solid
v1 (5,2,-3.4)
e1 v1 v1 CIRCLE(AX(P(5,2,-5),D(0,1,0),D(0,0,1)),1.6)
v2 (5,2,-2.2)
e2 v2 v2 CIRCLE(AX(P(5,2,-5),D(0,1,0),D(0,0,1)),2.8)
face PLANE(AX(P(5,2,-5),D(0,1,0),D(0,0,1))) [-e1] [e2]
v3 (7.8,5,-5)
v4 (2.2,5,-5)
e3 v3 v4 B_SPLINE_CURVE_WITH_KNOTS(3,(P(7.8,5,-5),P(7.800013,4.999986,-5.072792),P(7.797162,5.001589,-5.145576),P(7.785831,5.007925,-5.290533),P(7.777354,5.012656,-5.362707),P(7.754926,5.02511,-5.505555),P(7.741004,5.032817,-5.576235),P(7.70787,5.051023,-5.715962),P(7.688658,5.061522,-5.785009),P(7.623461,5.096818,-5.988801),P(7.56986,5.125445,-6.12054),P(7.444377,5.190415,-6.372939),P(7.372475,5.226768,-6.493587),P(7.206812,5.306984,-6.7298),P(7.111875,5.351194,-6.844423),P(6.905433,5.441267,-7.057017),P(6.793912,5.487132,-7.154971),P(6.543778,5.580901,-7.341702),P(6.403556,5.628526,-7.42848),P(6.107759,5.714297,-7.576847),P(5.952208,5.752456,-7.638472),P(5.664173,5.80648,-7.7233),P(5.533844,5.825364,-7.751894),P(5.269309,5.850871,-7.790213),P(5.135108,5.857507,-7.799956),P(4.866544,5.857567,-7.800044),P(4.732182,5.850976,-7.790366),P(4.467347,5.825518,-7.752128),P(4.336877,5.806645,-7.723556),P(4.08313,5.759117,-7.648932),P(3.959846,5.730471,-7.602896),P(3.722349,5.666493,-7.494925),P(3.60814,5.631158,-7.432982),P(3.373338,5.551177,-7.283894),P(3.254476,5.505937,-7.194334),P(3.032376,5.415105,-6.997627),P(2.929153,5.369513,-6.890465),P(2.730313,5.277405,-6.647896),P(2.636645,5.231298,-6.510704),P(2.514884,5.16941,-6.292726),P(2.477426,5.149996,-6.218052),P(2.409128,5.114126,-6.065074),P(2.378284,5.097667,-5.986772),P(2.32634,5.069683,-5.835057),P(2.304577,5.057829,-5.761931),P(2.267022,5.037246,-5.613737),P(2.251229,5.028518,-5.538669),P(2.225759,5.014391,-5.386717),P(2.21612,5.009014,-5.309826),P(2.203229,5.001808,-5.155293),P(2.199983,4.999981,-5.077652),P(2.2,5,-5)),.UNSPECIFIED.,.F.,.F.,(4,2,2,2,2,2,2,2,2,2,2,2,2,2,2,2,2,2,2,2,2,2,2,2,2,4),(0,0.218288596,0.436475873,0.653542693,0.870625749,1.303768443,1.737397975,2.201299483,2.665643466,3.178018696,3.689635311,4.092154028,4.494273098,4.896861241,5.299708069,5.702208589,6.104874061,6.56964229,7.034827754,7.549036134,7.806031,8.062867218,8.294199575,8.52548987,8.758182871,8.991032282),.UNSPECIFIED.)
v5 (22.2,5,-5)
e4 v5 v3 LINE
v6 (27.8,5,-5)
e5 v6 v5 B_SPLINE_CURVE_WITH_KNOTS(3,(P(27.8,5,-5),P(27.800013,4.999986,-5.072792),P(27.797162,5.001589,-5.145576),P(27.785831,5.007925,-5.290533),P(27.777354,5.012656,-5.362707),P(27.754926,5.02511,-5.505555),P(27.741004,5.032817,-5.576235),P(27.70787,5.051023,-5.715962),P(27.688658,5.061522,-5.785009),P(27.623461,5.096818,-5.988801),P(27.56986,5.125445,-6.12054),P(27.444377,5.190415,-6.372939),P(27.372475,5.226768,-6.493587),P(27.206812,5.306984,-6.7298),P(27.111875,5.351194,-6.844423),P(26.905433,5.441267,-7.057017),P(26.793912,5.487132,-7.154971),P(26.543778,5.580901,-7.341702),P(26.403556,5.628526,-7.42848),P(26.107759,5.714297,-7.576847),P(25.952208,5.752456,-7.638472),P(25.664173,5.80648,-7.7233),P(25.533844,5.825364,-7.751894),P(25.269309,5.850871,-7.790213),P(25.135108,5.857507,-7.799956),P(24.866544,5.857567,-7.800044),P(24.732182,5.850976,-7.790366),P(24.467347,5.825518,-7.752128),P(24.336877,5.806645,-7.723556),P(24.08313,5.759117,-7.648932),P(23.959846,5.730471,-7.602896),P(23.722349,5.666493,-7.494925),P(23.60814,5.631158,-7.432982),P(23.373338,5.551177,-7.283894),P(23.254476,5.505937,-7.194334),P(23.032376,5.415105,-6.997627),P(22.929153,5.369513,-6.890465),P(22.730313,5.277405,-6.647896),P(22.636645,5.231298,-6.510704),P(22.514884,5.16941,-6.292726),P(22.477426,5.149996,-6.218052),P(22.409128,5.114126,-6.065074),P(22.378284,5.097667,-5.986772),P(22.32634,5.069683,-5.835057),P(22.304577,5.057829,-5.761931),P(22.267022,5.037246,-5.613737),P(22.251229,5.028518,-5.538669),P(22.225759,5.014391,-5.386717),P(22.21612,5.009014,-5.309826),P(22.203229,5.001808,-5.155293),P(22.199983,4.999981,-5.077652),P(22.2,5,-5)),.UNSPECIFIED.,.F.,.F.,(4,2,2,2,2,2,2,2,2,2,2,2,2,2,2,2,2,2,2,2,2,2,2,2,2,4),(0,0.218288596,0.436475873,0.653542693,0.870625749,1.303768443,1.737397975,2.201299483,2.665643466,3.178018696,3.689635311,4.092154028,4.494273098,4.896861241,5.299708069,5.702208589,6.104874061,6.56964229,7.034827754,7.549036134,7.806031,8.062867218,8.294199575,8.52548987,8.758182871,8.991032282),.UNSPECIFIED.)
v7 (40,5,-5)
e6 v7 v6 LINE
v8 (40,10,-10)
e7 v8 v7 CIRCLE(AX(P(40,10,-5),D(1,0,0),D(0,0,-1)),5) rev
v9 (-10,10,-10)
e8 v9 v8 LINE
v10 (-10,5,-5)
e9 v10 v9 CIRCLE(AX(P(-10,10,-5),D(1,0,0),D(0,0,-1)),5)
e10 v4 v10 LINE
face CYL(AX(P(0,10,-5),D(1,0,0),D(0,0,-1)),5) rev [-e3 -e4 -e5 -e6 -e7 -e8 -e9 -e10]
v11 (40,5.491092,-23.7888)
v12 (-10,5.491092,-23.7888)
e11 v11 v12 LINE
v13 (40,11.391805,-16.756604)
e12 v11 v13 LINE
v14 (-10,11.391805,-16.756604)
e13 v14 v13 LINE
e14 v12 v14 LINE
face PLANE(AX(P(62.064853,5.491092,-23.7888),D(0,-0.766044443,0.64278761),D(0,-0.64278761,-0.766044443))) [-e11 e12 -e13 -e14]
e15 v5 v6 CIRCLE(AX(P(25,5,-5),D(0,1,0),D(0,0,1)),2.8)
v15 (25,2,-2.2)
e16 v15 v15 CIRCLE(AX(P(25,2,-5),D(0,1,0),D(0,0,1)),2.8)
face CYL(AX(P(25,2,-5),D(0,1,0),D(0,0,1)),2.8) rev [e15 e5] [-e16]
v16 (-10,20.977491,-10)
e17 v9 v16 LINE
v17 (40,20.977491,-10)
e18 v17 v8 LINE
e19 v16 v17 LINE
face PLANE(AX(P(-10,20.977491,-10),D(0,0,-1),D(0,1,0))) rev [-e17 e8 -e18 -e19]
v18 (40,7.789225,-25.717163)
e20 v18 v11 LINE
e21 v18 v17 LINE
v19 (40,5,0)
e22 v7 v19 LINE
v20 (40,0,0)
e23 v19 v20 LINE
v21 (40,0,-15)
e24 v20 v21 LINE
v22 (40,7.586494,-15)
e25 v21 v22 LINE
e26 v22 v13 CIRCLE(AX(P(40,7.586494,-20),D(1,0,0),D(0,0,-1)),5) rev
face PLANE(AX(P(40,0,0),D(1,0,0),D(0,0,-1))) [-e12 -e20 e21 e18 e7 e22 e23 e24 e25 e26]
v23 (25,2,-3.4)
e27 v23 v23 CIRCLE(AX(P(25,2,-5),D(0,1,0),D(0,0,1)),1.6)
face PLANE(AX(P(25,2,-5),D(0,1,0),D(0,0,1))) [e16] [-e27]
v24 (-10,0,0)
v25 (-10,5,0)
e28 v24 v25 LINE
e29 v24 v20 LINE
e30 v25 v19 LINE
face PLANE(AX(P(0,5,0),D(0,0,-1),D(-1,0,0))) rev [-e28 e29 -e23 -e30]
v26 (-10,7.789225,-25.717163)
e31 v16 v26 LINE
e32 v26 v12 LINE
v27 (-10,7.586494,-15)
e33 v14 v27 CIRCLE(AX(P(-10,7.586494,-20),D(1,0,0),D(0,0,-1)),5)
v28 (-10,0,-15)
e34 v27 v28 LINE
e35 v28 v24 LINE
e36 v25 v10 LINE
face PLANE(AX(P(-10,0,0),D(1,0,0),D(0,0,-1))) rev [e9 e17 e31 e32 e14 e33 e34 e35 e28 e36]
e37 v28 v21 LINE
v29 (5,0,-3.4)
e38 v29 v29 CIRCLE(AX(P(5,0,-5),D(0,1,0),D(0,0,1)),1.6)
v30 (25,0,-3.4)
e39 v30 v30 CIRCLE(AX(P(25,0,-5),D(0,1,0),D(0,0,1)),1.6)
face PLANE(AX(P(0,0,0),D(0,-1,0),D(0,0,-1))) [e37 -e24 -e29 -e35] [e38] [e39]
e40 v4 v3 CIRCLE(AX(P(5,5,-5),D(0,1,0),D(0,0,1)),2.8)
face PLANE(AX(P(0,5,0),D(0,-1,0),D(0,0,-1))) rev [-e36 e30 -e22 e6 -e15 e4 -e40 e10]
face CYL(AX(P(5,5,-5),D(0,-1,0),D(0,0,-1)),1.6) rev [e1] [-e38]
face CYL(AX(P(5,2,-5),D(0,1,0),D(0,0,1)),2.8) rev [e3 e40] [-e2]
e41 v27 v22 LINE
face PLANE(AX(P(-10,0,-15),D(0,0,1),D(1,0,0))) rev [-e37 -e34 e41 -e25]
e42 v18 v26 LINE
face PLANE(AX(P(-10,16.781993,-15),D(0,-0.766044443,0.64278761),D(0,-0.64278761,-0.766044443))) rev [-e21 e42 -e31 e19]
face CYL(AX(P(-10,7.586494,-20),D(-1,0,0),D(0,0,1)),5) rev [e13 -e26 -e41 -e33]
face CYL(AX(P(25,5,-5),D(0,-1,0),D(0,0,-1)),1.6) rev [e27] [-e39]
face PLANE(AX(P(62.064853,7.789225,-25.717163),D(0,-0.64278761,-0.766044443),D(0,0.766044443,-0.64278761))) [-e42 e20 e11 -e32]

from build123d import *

# Parameters (mm, degrees)
CROQUIS1_W              = 30
CROQUIS1_H              = 10
CROQUIS1_R              = 1.6
SALIENTE_EXTRUIR1_DEPTH = 5
CROQUIS2_R              = 2.8
CORTAR_EXTRUIR1_DEPTH   = 3
SALIENTE_EXTRUIR5_DEPTH = 10
SALIENTE_EXTRUIR6_DEPTH = 30
SALIENTE_EXTRUIR7_DEPTH = 10
REDONDEO1_R             = 5
REDONDEO2_R             = 5
SALIENTE_EXTRUIR8_DEPTH = 50


# Some blends are built 0.0001 mm under size
with BuildPart() as part:
    # Croquis1 → Saliente-Extruir1 (new body)
    with BuildSketch(Plane(origin=(0, 0, 0), x_dir=(1, 0, 0), z_dir=(0, 1, 0))):
        with Locations((15, 5)):
            Rectangle(CROQUIS1_W, CROQUIS1_H)
        with Locations(Location((5, 5, 0), (0, 0, 270))):
            Circle(CROQUIS1_R, mode=Mode.SUBTRACT)
        with Locations(Location((25, 5, 0), (0, 0, 270))):
            Circle(CROQUIS1_R, mode=Mode.SUBTRACT)
    extrude(amount=SALIENTE_EXTRUIR1_DEPTH)

    # Croquis2 → Cortar-Extruir1 (cut)
    with BuildSketch(Plane(origin=(0, 5, 0), x_dir=(1, 0, 0), z_dir=(0, 1, 0))):
        with Locations(Location((5, 5, 0), (0, 0, 270))):
            Circle(CROQUIS2_R)
        with Locations(Location((25, 5, 0), (0, 0, 270))):
            Circle(CROQUIS2_R)
    extrude(amount=-CORTAR_EXTRUIR1_DEPTH, mode=Mode.SUBTRACT)

    # Croquis6 → Saliente-Extruir5 (add)
    with BuildSketch(Plane.ZY):
        Polygon((-15, 16.781992624), (-10, 20.977490779), (-10, 16.781992624), (-10, 5), (0, 5), (0, 0), (-10, 0), (-15, 0), (-15, 12.586494468), (-20, 12.586494468), align=None)
    extrude(amount=SALIENTE_EXTRUIR5_DEPTH)

    # Croquis7 → Saliente-Extruir6 (add)
    with BuildSketch(Plane(origin=(0, 0, 0), x_dir=(0, 0, -1), z_dir=(1, 0, 0))):
        Polygon((10, 20.977490779), (10, 5), (10, 0), (15, 0), (15, 12.586494468), (20, 12.586494468), align=None)
    extrude(amount=SALIENTE_EXTRUIR6_DEPTH)

    # Croquis8 → Saliente-Extruir7 (add)
    with BuildSketch(Plane(origin=(30, 0, 0), x_dir=(0, 0, -1), z_dir=(1, 0, 0))):
        Polygon((0, 0), (15, 0), (15, 12.586494468), (20, 12.586494468), (10, 20.977490779), (10, 5), (0, 5), align=None)
    extrude(amount=SALIENTE_EXTRUIR7_DEPTH)

    # Redondeo1
    # the kernel refuses this fillet: 5 mm, written as the material it adds along each edge
    with BuildSketch(Plane(origin=(40, 5, -10), x_dir=(0, 1, 0), z_dir=(-1, 0, 0))) as redondeo1_piece_1_section:
        with BuildLine():
            CenterArc((REDONDEO1_R, -REDONDEO1_R), REDONDEO1_R, 90, 90)
            Line((0, -REDONDEO1_R), (0, 0))
            Line((0, 0), (REDONDEO1_R, 0))
        make_face()
    redondeo1_piece_1 = extrude(amount=50, mode=Mode.PRIVATE)
    redondeo1_piece_1 = redondeo1_piece_1 - Plane(origin=(5, 6.156265405, -5), x_dir=(0, 0, 1), z_dir=(0, 1, 0)) * Cylinder(2.8, 120, mode=Mode.PRIVATE)
    redondeo1_piece_1 = redondeo1_piece_1 - Plane(origin=(25, 6.156265405, -5), x_dir=(0, 0, 1), z_dir=(0, 1, 0)) * Cylinder(2.8, 120, mode=Mode.PRIVATE)
    add(redondeo1_piece_1)

    # Redondeo2
    redondeo2_edges = [part.edges().sort_by_distance(p)[0] for p in [
        (15, 12.586494468, -15),
    ]]
    fillet(redondeo2_edges, radius=REDONDEO2_R - 0.0001)  # a hair under: the kernel refuses the full size

    # Croquis9 → Saliente-Extruir8 (add)
    with BuildSketch(Plane.ZY.offset(10)):
        Polygon((-20, 12.586494468), (-25.717162805, 7.789225266), (-23.788799976, 5.491091937), (-10, 17.061268911), (-10, 20.977490779), align=None)
    extrude(amount=-SALIENTE_EXTRUIR8_DEPTH)


solid = part.part
